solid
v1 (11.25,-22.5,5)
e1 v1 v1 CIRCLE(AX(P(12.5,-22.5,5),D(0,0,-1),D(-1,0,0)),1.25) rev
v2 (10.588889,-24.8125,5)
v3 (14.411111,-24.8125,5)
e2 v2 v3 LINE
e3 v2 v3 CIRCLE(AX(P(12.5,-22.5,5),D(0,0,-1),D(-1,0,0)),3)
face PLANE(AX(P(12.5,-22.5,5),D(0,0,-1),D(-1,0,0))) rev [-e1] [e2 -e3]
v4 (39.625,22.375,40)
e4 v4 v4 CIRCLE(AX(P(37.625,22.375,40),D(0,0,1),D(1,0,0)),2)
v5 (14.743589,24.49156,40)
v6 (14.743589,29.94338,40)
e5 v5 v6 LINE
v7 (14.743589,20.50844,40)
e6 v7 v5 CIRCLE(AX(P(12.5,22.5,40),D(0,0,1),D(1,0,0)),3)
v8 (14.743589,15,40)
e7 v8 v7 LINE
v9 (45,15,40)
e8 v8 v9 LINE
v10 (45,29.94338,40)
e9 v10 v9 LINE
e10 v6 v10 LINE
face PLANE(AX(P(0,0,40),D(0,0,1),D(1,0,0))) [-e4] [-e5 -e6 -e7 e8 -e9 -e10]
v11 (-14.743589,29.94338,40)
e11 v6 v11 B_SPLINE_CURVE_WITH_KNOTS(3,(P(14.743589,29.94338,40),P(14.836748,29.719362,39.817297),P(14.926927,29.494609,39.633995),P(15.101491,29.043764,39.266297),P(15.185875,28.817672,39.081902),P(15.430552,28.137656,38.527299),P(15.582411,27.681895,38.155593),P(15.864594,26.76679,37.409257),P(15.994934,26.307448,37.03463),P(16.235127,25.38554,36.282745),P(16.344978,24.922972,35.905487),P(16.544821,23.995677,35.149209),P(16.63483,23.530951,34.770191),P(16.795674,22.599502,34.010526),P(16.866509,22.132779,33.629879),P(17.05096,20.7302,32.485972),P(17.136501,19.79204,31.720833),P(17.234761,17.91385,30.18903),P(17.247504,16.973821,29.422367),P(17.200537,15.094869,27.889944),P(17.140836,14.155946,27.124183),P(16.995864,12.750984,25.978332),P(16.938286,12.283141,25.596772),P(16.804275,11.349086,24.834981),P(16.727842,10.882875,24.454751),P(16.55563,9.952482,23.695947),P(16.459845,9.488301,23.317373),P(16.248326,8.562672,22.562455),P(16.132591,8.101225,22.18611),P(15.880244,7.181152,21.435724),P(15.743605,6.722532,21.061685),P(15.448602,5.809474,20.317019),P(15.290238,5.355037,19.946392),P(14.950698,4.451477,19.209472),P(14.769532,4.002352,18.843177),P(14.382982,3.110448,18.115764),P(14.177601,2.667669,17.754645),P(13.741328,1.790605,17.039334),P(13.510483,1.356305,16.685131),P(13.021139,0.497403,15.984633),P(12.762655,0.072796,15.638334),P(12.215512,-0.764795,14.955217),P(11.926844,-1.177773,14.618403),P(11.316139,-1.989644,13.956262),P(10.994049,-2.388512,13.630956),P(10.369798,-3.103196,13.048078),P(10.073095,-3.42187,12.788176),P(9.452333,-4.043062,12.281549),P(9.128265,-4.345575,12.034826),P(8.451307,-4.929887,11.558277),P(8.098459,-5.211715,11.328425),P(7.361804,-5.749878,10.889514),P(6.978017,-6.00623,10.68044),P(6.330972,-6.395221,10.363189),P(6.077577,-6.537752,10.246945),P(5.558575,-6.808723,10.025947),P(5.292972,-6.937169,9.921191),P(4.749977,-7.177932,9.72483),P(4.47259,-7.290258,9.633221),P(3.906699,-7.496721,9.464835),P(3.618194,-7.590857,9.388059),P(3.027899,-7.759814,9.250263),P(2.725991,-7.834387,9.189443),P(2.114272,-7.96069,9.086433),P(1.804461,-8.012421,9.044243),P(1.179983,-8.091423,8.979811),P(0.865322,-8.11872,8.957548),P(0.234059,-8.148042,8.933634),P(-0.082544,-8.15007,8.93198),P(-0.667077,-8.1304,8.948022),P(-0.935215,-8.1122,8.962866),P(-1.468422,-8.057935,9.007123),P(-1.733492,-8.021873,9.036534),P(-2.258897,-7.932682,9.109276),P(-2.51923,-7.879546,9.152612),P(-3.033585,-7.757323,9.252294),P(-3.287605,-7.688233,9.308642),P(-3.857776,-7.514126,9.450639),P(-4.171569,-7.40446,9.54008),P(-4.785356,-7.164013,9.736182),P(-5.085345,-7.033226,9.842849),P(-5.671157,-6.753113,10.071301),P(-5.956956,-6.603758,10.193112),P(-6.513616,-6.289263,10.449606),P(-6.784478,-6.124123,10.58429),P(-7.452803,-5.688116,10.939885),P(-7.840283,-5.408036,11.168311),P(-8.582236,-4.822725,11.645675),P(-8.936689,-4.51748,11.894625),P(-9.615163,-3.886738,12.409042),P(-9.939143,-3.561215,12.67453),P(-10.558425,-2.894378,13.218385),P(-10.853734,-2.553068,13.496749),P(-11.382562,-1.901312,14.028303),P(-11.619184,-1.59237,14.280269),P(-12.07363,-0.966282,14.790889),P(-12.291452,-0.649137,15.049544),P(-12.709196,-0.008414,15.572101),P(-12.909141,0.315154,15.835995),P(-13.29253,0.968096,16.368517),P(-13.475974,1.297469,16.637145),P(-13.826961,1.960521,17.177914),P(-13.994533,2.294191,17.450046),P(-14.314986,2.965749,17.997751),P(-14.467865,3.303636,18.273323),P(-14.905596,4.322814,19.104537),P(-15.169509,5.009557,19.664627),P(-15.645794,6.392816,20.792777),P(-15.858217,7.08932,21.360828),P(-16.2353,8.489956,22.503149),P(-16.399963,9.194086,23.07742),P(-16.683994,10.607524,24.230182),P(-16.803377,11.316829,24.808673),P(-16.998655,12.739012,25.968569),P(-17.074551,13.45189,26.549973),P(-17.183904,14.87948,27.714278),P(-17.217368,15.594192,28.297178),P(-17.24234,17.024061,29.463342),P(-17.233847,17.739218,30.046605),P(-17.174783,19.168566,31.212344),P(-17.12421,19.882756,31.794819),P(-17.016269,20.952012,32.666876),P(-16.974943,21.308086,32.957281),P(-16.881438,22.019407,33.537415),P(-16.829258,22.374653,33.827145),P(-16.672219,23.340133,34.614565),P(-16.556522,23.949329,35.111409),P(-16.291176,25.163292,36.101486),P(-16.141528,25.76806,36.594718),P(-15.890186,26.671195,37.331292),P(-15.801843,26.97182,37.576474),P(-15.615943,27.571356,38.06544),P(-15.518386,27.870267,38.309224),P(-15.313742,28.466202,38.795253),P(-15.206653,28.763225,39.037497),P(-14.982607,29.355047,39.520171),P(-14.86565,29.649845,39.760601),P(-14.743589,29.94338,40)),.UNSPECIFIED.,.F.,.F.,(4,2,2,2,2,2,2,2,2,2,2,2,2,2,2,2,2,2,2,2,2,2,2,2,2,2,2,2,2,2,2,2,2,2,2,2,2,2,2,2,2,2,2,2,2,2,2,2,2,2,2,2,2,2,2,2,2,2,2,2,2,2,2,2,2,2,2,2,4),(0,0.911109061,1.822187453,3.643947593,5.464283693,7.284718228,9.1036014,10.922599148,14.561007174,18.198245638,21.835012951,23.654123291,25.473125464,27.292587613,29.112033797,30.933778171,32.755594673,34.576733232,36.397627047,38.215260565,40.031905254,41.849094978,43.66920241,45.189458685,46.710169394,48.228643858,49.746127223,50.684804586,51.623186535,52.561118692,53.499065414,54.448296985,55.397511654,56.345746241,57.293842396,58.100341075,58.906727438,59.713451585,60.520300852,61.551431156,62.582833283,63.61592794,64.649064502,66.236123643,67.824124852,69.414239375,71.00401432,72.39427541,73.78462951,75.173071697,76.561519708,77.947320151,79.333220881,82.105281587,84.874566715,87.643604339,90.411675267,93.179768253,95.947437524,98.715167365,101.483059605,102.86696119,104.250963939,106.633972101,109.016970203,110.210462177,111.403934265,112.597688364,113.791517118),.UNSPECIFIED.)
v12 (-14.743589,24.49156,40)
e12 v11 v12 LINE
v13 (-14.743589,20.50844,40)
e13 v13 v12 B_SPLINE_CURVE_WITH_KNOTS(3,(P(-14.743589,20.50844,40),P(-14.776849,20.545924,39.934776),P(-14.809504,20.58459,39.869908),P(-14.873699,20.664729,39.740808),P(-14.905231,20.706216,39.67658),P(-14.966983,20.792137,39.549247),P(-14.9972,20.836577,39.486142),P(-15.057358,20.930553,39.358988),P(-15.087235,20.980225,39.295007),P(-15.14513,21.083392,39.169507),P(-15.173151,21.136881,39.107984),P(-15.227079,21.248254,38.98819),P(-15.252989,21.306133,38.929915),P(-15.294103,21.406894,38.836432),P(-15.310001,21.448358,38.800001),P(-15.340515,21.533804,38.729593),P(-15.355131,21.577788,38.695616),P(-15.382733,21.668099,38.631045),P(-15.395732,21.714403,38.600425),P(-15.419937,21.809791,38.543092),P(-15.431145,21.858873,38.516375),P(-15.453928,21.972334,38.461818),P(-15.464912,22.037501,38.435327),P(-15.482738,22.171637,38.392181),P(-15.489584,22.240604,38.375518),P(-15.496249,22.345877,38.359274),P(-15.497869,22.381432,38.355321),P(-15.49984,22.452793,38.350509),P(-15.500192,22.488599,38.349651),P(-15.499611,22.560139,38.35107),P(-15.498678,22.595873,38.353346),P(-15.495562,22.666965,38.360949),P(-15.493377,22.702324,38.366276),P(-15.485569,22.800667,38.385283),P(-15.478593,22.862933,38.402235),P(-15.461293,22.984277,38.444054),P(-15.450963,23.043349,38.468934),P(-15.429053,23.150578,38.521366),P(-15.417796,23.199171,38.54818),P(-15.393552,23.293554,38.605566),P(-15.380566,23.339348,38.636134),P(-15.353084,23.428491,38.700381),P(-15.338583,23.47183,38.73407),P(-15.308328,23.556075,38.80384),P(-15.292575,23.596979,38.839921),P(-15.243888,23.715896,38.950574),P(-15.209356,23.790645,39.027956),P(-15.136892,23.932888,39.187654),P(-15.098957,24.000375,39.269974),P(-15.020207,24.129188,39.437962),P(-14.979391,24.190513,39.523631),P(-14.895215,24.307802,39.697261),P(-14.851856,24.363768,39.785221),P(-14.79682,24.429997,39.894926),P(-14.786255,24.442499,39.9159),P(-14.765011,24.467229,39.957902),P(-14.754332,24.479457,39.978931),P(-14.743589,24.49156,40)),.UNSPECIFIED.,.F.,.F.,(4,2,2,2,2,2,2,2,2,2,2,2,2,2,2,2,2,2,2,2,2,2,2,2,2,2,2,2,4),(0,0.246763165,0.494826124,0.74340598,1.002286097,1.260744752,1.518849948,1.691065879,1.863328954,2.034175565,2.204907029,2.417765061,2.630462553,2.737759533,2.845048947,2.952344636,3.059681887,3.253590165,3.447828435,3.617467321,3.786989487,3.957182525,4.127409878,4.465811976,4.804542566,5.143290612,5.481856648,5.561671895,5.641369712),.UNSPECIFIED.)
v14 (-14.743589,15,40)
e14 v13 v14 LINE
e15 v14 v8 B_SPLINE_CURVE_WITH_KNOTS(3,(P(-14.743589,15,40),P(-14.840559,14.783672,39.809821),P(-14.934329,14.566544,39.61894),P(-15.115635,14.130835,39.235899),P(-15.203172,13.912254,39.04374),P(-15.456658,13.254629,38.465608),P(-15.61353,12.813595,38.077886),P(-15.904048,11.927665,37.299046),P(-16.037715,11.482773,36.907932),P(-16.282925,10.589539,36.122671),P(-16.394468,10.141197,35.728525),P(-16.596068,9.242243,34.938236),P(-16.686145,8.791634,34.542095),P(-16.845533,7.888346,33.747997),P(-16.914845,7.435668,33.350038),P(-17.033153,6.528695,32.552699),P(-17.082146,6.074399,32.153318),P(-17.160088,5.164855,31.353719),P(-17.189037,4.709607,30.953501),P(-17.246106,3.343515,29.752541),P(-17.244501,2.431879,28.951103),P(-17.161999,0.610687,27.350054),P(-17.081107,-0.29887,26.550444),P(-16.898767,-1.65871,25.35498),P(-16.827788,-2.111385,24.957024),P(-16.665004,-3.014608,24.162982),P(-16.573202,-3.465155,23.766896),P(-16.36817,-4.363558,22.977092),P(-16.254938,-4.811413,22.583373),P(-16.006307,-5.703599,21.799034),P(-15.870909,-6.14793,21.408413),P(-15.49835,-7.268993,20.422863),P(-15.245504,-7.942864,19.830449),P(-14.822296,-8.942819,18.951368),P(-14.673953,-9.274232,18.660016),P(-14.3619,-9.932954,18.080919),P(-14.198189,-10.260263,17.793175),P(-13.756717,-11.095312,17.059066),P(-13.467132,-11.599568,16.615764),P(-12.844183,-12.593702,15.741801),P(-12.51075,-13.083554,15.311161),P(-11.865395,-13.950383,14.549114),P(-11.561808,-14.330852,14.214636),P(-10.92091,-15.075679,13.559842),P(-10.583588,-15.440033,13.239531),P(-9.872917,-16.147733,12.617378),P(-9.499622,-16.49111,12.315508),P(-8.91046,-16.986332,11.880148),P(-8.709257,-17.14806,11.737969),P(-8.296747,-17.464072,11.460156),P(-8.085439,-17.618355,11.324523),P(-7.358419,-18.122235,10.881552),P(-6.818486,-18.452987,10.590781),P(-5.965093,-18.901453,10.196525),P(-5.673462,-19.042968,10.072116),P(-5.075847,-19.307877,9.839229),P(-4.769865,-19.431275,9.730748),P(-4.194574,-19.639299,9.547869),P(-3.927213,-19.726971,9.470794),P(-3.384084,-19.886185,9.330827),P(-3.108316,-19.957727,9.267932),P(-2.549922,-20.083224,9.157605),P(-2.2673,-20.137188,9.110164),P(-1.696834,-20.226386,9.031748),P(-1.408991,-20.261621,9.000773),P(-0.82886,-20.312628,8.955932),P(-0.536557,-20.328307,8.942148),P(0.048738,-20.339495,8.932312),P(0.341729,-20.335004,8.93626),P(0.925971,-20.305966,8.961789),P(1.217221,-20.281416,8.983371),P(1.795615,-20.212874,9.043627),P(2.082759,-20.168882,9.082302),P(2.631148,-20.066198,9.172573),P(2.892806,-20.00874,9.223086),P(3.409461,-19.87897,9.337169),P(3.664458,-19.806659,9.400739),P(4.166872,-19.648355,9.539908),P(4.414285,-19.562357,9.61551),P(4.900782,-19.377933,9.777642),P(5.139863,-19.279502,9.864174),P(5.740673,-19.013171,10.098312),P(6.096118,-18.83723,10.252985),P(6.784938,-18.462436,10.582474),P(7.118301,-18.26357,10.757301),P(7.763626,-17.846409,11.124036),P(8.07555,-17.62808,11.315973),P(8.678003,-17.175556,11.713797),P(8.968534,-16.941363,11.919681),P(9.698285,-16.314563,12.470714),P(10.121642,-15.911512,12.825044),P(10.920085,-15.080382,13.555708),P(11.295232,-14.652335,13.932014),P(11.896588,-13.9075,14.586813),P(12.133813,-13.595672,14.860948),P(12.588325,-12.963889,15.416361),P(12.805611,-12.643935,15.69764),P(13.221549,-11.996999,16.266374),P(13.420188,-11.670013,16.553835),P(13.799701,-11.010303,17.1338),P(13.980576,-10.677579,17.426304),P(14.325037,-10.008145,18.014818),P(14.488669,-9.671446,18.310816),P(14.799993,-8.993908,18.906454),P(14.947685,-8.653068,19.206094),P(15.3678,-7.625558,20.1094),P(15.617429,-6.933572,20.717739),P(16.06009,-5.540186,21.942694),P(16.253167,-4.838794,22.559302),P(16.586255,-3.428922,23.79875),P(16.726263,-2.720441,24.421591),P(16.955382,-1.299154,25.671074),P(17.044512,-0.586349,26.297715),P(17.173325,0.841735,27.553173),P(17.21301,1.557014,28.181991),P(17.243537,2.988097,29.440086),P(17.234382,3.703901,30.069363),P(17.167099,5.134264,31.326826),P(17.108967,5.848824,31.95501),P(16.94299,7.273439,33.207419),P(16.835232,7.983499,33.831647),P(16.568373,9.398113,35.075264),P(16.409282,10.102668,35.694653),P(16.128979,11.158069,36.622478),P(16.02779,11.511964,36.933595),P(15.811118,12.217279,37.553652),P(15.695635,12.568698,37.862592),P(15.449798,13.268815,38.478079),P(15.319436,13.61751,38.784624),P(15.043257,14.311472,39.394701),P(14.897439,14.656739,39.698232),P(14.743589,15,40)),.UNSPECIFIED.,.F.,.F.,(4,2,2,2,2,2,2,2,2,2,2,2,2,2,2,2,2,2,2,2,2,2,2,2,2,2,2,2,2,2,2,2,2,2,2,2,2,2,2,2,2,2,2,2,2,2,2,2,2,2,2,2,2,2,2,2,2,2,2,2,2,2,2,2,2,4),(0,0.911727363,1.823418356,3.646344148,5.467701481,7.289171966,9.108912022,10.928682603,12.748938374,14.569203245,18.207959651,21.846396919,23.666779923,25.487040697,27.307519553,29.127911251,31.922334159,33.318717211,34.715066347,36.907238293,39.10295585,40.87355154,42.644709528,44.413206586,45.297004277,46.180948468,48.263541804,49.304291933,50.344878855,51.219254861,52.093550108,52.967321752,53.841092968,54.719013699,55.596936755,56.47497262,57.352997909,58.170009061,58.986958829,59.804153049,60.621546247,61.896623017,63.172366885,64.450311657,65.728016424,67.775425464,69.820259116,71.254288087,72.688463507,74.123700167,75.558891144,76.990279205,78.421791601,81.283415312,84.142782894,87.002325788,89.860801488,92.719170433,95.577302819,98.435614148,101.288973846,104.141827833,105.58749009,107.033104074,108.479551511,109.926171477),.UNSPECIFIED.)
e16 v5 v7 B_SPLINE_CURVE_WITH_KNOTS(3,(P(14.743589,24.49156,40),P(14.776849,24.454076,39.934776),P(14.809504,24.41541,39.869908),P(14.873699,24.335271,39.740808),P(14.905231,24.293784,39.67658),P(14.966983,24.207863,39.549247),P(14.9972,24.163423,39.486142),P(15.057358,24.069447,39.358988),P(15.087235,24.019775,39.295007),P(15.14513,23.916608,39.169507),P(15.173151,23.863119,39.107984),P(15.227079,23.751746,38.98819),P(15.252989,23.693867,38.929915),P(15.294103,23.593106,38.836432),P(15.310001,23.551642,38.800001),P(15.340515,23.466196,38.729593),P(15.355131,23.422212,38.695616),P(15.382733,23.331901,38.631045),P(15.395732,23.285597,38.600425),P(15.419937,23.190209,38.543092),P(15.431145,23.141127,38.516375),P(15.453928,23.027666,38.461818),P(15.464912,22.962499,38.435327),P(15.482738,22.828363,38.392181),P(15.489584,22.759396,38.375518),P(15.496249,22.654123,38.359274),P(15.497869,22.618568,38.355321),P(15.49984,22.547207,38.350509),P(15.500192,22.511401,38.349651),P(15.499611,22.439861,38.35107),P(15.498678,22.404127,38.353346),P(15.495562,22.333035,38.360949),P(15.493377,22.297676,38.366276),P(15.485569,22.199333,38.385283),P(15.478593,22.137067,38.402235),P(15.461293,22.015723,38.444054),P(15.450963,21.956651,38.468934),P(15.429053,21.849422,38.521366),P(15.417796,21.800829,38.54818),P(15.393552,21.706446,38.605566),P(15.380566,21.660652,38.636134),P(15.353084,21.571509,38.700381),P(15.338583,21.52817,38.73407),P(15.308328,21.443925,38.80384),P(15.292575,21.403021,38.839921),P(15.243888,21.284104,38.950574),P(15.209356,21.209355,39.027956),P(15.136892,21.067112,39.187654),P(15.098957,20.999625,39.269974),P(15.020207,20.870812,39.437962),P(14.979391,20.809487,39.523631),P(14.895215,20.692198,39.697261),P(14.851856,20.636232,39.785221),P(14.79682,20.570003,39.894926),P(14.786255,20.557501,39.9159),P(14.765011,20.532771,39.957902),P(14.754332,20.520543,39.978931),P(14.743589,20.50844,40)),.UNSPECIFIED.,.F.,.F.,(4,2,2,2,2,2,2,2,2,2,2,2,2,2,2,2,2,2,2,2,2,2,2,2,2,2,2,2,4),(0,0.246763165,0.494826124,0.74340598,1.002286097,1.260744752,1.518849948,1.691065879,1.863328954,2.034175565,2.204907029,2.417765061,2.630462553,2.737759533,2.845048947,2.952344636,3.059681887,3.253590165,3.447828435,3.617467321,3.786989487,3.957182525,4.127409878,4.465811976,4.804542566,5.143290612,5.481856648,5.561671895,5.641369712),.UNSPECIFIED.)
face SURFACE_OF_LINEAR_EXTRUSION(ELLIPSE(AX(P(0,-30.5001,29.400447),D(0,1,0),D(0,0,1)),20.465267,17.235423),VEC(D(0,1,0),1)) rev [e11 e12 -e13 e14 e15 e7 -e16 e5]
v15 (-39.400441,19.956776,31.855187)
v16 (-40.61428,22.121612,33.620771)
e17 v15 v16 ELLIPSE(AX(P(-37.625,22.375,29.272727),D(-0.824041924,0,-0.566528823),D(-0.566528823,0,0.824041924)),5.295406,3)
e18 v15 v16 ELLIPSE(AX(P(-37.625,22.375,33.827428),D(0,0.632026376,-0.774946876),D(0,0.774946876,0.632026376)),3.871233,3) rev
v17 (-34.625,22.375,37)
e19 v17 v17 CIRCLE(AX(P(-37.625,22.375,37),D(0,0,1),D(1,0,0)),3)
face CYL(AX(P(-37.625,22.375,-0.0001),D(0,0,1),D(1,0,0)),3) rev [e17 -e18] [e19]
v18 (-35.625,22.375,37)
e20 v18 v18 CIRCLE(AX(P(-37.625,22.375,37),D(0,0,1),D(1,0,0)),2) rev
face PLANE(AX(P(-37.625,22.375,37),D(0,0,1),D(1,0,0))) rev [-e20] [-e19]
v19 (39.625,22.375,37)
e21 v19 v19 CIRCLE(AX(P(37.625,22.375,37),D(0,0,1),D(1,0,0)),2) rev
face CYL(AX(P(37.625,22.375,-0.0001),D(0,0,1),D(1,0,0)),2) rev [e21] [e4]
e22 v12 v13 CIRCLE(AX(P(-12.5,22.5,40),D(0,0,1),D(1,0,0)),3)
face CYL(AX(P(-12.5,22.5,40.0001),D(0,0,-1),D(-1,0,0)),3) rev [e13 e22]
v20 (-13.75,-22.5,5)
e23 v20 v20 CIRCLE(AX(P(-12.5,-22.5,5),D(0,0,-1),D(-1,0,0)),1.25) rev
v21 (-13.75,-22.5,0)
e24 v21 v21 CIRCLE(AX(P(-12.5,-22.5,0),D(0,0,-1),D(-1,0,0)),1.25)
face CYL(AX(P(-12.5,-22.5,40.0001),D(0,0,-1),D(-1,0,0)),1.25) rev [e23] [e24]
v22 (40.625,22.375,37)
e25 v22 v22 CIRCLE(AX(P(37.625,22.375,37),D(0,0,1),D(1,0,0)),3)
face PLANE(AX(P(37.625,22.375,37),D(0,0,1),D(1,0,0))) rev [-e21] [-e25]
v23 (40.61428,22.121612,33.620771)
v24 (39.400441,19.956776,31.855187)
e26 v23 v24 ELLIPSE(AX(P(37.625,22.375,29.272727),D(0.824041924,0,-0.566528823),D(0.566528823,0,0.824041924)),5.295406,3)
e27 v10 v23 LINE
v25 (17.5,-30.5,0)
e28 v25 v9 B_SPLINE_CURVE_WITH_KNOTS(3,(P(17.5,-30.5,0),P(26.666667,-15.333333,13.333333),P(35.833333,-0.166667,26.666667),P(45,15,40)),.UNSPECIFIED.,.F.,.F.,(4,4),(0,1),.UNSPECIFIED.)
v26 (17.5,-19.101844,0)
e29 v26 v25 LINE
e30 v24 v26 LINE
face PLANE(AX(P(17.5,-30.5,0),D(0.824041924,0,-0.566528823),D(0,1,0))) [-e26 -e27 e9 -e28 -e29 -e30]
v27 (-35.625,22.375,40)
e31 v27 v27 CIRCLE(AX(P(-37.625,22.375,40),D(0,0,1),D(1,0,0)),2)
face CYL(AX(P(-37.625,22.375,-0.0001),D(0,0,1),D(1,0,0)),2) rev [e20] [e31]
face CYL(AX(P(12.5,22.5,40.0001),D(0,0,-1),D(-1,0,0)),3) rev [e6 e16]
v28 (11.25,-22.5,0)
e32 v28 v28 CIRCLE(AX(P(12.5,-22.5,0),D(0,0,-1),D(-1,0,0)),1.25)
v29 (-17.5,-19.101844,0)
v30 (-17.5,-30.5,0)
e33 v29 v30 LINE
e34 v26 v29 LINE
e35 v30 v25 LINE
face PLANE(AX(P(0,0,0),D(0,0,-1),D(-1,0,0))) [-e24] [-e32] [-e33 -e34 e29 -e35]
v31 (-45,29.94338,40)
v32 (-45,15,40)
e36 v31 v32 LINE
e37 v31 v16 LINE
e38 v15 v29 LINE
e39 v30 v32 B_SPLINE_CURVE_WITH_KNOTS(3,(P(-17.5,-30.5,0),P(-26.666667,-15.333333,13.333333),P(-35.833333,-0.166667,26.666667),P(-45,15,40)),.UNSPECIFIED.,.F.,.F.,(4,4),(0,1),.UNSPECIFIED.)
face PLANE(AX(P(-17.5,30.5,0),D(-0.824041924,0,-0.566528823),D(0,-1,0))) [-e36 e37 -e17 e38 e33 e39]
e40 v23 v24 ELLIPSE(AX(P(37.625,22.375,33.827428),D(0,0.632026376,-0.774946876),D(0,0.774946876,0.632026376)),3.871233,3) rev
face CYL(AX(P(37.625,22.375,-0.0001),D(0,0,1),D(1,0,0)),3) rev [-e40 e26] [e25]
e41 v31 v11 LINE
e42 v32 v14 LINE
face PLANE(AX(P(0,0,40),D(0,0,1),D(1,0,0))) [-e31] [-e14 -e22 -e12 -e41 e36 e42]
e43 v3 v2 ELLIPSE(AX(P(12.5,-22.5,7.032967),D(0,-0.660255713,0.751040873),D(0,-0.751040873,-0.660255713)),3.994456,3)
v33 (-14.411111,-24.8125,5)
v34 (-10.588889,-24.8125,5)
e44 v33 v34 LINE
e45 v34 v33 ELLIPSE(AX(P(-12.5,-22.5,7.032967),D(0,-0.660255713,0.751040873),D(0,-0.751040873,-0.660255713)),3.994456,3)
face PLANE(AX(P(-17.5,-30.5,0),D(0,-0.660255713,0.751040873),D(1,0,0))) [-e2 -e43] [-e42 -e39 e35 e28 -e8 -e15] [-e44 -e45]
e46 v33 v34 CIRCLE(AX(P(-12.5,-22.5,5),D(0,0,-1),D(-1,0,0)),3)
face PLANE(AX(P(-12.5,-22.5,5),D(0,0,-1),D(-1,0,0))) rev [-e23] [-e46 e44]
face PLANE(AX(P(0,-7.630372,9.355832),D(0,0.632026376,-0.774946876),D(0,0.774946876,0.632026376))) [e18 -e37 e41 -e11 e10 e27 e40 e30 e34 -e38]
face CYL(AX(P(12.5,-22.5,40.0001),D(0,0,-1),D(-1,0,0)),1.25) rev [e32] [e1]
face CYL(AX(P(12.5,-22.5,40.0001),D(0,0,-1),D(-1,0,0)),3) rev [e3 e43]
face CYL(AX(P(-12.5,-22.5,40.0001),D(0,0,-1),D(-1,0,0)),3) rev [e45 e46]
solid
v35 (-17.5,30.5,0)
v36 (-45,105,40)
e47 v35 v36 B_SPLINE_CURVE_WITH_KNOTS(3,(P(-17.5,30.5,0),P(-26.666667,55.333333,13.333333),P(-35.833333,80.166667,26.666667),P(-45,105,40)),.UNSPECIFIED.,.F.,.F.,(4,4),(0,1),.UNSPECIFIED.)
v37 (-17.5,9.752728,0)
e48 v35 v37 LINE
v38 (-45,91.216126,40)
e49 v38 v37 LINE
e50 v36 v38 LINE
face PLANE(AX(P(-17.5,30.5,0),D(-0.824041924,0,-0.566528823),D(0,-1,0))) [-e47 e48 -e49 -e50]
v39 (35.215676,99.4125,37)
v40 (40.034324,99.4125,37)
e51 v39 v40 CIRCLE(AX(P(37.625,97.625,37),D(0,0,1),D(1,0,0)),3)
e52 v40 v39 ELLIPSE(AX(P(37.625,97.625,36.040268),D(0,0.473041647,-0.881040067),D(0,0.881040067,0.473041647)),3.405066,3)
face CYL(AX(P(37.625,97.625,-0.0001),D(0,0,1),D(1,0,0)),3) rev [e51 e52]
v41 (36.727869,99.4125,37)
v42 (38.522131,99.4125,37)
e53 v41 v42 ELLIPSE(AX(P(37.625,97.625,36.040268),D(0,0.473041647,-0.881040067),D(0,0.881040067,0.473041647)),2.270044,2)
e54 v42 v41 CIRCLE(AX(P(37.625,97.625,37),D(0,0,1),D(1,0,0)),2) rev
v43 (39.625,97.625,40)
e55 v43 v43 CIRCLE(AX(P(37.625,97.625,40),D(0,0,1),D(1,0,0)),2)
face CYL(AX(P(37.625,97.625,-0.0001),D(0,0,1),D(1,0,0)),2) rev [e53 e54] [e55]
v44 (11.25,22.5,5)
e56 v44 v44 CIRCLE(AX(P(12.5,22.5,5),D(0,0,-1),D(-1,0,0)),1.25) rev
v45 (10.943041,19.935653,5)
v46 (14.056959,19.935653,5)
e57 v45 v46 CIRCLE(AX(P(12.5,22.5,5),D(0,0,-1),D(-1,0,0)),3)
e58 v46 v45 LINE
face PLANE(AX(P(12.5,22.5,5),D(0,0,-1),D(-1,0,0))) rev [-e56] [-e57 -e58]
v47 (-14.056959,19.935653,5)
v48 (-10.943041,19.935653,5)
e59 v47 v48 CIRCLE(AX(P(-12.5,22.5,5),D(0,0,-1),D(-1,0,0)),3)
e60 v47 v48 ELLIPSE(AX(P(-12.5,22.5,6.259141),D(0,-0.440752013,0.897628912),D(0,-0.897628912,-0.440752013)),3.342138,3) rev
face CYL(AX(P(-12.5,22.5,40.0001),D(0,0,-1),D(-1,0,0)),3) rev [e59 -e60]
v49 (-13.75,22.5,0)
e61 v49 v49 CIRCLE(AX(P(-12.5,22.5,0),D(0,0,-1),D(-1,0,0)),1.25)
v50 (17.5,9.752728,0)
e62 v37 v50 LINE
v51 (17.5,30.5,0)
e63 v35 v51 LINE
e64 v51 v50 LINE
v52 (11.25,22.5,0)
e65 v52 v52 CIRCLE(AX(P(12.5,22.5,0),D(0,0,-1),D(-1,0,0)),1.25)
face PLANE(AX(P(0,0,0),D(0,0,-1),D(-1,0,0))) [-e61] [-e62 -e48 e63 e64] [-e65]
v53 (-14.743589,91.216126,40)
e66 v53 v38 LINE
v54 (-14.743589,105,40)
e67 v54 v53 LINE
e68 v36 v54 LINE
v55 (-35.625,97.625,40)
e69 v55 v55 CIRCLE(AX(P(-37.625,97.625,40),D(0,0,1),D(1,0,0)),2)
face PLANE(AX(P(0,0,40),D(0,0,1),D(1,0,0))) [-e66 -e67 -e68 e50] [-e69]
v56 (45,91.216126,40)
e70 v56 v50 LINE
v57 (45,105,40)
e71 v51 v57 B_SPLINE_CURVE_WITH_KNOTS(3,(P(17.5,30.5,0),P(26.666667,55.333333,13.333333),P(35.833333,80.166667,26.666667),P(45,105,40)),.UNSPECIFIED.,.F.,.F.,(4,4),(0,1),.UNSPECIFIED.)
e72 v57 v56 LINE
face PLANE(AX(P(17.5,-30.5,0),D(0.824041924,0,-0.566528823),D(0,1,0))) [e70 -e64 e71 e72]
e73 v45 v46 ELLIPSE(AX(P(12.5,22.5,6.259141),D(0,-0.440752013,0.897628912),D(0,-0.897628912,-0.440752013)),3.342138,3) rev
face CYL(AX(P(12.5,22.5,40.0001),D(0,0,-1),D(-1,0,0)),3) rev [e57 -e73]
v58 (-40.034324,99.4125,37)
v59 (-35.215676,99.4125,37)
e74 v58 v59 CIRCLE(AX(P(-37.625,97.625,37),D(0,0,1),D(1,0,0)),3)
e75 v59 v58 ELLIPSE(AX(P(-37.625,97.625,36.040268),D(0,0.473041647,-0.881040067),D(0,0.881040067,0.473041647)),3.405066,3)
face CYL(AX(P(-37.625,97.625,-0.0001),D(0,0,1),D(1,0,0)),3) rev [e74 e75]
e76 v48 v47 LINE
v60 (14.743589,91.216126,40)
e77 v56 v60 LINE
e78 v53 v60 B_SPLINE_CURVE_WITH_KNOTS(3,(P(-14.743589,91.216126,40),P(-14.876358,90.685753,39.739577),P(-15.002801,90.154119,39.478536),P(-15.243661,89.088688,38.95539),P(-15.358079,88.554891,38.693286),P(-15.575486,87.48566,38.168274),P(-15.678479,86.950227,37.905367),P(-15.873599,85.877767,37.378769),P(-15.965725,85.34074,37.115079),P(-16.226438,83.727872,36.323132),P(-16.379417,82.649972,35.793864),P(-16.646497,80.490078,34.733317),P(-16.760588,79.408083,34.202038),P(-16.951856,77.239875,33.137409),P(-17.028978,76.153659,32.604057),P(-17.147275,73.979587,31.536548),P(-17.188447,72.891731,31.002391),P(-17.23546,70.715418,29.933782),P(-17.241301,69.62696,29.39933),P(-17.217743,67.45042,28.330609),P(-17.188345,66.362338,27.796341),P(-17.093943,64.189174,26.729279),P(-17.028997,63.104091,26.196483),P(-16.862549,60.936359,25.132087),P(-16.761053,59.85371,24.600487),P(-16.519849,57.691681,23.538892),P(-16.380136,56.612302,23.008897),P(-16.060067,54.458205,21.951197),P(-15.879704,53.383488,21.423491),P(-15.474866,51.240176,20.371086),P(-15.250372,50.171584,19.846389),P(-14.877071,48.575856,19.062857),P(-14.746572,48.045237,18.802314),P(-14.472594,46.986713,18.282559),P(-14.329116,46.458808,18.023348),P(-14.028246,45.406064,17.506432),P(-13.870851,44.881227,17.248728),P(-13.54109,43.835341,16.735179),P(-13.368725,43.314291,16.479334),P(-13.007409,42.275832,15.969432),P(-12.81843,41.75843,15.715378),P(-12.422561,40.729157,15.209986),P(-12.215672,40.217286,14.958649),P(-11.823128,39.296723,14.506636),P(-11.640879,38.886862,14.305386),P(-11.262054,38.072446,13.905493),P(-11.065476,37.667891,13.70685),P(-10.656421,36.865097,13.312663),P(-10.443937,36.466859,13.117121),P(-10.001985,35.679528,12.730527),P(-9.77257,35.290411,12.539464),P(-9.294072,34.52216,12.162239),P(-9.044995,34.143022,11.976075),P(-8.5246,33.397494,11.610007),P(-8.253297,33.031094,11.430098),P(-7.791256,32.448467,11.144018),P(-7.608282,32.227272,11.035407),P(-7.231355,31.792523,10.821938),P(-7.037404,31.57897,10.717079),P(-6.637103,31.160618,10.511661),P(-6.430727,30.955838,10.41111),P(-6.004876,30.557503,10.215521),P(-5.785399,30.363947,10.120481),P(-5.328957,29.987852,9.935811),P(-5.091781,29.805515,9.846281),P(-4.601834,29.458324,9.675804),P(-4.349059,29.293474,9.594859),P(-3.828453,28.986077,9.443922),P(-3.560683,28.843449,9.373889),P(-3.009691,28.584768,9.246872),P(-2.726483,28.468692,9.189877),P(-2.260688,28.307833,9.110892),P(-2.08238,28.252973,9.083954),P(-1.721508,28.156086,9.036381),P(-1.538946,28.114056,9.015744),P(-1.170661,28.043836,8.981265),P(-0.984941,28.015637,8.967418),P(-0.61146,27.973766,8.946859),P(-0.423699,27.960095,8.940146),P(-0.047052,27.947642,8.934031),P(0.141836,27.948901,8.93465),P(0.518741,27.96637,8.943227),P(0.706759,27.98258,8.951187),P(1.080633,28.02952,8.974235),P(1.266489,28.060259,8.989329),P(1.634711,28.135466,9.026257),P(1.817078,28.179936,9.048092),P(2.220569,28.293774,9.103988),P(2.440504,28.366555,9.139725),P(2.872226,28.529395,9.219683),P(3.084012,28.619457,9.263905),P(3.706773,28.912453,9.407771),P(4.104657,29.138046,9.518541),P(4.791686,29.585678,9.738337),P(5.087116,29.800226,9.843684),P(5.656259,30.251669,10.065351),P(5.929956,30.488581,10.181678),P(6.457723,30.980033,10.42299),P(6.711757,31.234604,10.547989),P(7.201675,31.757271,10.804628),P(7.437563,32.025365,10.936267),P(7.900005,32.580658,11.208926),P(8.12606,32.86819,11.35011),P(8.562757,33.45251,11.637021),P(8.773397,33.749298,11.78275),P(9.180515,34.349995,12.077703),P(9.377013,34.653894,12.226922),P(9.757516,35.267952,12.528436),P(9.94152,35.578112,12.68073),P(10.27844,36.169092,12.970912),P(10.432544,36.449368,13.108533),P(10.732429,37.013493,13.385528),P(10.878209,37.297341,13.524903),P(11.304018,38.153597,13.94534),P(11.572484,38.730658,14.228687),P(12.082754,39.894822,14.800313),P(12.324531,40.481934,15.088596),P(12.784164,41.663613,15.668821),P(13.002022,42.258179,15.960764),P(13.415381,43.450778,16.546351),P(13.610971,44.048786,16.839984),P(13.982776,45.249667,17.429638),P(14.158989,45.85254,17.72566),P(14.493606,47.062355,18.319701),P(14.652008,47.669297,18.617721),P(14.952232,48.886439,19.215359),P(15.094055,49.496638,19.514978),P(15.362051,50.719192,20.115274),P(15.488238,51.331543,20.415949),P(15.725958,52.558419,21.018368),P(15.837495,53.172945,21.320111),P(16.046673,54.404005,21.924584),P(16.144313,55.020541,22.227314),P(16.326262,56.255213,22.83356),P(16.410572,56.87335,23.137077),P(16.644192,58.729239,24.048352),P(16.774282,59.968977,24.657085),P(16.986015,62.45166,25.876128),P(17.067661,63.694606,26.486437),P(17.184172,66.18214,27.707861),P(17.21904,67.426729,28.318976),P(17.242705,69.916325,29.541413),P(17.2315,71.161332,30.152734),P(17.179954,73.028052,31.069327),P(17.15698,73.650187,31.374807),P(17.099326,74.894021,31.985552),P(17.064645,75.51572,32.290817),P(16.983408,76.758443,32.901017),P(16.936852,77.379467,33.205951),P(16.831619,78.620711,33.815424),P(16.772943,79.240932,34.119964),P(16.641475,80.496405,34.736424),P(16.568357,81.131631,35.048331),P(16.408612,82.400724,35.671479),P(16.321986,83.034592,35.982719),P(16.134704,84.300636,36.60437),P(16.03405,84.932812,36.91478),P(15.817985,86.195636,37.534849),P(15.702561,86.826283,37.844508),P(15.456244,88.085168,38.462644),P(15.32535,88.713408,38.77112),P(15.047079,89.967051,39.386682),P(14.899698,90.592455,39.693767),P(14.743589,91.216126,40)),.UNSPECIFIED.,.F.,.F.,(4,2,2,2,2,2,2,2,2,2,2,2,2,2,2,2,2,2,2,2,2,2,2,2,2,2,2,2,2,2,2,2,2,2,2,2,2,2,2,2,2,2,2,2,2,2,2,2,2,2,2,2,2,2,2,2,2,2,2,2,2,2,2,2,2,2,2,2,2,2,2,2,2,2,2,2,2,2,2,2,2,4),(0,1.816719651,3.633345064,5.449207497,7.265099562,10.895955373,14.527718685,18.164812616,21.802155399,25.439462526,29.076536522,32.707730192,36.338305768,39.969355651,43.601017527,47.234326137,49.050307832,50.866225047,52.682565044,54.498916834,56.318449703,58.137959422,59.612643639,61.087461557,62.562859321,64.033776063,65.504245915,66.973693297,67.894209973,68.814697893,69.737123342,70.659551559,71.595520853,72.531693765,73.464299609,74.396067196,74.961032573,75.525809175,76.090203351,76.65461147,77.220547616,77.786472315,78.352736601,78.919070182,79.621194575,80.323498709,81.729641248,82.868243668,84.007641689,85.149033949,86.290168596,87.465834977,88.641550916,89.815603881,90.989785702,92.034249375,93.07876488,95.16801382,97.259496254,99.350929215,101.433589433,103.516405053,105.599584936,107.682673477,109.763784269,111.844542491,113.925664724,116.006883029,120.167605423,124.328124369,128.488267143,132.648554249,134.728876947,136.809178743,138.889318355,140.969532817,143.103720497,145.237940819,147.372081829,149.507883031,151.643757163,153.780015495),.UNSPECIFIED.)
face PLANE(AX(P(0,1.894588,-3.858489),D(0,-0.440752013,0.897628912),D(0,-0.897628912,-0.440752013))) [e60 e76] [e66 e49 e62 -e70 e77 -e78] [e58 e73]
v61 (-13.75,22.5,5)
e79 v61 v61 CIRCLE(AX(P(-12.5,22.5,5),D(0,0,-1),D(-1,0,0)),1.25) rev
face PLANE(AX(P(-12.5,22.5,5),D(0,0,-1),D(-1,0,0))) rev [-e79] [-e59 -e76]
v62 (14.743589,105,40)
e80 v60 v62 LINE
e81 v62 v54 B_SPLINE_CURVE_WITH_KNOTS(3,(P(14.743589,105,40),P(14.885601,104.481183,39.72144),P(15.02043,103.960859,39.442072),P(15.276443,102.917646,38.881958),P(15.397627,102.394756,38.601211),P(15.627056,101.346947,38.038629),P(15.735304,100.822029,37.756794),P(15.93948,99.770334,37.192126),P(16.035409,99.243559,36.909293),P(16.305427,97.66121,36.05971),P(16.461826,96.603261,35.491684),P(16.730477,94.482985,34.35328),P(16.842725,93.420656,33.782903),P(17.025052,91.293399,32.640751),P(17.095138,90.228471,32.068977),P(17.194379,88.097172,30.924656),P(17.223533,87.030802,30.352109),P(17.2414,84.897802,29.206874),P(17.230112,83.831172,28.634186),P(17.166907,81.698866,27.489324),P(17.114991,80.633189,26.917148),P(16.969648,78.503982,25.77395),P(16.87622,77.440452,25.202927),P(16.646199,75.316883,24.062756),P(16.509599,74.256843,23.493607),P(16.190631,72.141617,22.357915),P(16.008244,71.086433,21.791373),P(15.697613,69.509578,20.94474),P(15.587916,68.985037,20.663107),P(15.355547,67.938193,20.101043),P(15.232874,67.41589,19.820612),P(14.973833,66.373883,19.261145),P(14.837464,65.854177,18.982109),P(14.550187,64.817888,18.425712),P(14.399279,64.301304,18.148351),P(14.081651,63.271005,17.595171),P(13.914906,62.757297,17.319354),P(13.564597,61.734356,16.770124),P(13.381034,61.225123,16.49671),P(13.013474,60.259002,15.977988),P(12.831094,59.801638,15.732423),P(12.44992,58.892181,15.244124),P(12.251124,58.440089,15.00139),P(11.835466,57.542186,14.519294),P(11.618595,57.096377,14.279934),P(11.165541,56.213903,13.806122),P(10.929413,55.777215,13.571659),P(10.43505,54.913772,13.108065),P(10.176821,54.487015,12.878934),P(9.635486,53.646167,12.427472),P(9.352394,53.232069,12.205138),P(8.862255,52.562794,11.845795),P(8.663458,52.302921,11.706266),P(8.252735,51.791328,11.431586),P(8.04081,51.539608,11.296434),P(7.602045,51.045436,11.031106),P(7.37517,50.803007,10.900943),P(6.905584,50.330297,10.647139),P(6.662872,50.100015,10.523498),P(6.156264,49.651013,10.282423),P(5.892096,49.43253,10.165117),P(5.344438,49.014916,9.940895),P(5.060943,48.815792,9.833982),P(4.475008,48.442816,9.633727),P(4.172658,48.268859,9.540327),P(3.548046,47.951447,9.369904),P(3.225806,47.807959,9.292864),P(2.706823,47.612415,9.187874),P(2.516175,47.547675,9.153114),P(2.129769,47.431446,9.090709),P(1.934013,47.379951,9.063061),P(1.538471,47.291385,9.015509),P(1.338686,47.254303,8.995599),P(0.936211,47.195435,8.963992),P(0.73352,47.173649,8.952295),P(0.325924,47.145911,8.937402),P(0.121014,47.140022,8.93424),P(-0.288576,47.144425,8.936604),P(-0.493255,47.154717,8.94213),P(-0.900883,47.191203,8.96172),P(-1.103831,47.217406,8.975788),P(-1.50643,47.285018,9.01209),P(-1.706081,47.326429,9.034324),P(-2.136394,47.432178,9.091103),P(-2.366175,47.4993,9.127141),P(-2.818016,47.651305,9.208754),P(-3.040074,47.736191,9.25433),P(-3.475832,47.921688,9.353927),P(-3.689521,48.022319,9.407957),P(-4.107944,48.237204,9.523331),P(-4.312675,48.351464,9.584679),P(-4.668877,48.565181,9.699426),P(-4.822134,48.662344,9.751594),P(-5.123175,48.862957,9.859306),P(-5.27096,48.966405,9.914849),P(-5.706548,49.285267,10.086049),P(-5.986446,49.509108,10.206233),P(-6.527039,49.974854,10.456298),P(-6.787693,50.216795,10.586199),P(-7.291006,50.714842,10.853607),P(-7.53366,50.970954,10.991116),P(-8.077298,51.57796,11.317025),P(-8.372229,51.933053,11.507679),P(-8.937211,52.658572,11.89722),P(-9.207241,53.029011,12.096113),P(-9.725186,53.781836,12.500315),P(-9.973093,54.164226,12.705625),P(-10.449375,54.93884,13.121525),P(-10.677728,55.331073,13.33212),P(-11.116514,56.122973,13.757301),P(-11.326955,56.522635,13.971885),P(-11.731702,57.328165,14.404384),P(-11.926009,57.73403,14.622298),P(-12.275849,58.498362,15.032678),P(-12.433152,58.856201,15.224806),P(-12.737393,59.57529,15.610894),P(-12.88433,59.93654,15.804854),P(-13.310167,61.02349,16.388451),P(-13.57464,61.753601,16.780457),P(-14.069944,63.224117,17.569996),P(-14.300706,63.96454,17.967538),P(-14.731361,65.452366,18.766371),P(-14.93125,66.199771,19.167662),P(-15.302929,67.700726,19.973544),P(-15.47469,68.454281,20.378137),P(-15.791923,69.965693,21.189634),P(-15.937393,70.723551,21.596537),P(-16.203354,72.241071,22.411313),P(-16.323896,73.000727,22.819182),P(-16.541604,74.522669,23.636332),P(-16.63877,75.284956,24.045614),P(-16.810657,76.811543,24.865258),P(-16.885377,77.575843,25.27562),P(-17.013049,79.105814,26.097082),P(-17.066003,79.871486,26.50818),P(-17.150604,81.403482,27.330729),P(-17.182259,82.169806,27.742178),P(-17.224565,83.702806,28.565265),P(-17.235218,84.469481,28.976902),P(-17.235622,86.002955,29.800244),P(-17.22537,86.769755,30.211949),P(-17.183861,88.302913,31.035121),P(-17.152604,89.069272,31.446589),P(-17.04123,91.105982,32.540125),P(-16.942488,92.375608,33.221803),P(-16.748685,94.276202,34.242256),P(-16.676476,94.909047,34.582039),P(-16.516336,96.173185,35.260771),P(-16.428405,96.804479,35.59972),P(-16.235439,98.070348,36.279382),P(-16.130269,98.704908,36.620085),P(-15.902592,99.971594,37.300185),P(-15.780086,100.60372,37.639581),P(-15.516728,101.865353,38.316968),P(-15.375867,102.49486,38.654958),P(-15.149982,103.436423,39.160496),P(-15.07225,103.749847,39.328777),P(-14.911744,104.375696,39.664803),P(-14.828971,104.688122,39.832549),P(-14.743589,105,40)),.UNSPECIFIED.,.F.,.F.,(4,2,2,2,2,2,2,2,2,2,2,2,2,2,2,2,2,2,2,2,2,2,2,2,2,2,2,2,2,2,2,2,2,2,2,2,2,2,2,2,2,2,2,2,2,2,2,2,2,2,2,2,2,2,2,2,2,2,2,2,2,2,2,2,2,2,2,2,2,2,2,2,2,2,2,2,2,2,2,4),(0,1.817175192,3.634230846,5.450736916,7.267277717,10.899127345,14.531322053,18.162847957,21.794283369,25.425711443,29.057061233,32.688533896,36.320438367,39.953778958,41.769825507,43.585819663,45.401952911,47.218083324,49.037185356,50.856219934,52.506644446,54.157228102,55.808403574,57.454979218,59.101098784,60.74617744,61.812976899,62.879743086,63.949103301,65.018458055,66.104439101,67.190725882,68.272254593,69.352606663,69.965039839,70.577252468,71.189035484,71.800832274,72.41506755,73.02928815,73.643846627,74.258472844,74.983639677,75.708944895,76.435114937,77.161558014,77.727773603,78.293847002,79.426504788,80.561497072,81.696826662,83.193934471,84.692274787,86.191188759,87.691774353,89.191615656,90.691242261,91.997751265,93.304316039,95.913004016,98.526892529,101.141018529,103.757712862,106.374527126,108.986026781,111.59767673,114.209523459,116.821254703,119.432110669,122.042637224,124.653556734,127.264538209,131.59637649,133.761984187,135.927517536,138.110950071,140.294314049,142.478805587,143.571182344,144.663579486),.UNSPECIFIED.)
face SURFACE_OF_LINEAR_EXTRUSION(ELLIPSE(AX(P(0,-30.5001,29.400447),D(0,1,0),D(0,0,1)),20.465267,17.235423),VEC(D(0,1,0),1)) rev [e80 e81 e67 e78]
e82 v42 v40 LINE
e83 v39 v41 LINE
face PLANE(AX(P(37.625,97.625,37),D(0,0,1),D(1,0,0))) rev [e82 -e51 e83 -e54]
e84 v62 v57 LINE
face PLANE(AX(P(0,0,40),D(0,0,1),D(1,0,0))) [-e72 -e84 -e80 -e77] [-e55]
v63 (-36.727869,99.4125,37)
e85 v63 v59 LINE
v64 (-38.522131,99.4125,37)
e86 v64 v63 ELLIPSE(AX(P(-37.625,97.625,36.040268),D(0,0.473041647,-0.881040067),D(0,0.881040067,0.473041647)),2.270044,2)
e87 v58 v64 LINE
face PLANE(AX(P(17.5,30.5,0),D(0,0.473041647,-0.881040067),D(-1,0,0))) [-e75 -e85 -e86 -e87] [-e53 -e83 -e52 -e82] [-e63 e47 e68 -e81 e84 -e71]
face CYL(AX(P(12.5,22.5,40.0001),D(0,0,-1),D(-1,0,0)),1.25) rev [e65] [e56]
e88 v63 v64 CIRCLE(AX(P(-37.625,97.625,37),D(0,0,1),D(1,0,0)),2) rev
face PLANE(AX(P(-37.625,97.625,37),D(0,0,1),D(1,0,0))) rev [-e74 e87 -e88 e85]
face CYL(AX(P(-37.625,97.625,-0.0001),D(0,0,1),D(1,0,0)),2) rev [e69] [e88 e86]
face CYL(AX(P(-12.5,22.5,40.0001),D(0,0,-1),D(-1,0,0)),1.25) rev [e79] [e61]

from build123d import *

# Parameters (mm, degrees)
SKETCH_5_R               = 1.25
CUT_EXTRUDE_1_DEPTH      = 122.037184526
CUT_EXTRUDE_START        = -5
SKETCH_6_R               = 3
CUT_EXTRUDE_2_DEPTH      = 117.037184526
SKETCH_7_R               = 2
CUT_EXTRUDE_3_DEPTH      = 122.037184526
CUT_EXTRUDE_START_2      = -3
SKETCH_8_R               = 3
CUT_EXTRUDE_4_DEPTH      = 119.037184526
CUT_EXTRUDE_5_DEPTH      = 122.037184526
CUT_EXTRUDE_5_DEPTH_BACK = 122.037184526
SKETCH_12_RX             = 20.465266771
SKETCH_12_RY             = 17.235422909


with BuildPart() as part:
    # Loft 1: read off the stored shape, not the designer's step
    # Loft 1: loft between two sections, ruled curve by curve
    loft_1_from = [
        Edge.make_line((-17.5, 30.5, 0), (17.5, 30.5, 0)),
        Edge.make_line((17.5, 30.5, 0), (17.5, -30.5, 0)),
        Edge.make_line((-17.5, -30.5, 0), (17.5, -30.5, 0)),
        Edge.make_line((-17.5, 30.5, 0), (-17.5, -30.5, 0)),
    ]
    loft_1_to = [
        Edge.make_line((-45, 105, 40), (45, 105, 40)),
        Edge.make_line((45, 105, 40), (45, 15, 40)),
        Edge.make_line((-45, 15, 40), (45, 15, 40)),
        Edge.make_line((-45, 105, 40), (-45, 15, 40)),
    ]
    loft_1 = Solid(Shell([*[Face.make_surface_from_curves(loft_1_from[k], loft_1_to[k]) for k in range(4)], Face(Wire(loft_1_from)), Face(Wire(loft_1_to))]))
    add(loft_1)

    # 草图5 → 切除-拉伸1 (cut, through all)
    with BuildSketch(Plane(origin=(0, 0, 0), x_dir=(-1, 0, 0), z_dir=(0, 0, -1))):
        with Locations((-12.5, 22.5)):
            Circle(SKETCH_5_R)
        with Locations((12.5, 22.5)):
            Circle(SKETCH_5_R)
        with Locations((12.5, -22.5)):
            Circle(SKETCH_5_R)
        with Locations((-12.5, -22.5)):
            Circle(SKETCH_5_R)
    extrude(amount=-CUT_EXTRUDE_1_DEPTH, mode=Mode.SUBTRACT)

    # 草图6 → 切除-拉伸2 (cut, through all)
    with BuildSketch(Plane(origin=(0, 0, 0), x_dir=(-1, 0, 0), z_dir=(0, 0, -1)).offset(CUT_EXTRUDE_START)):
        with Locations((-12.5, 22.5)):
            Circle(SKETCH_6_R)
        with Locations((12.5, 22.5)):
            Circle(SKETCH_6_R)
        with Locations((-12.5, -22.5)):
            Circle(SKETCH_6_R)
        with Locations((12.5, -22.5)):
            Circle(SKETCH_6_R)
    extrude(amount=-CUT_EXTRUDE_2_DEPTH, mode=Mode.SUBTRACT)

    # 草图7 → 切除-拉伸3 (cut, through all)
    with BuildSketch(Plane.XY.offset(40)):
        with Locations((37.625, 22.375)):
            Circle(SKETCH_7_R)
        with Locations((-37.625, 22.375)):
            Circle(SKETCH_7_R)
        with Locations((-37.625, 97.625)):
            Circle(SKETCH_7_R)
        with Locations((37.625, 97.625)):
            Circle(SKETCH_7_R)
    extrude(amount=-CUT_EXTRUDE_3_DEPTH, mode=Mode.SUBTRACT)

    # 草图8 → 切除-拉伸4 (cut, through all)
    with BuildSketch(Plane.XY.offset(40).offset(CUT_EXTRUDE_START_2)):
        with Locations((-37.625, 97.625)):
            Circle(SKETCH_8_R)
        with Locations((37.625, 97.625)):
            Circle(SKETCH_8_R)
        with Locations((37.625, 22.375)):
            Circle(SKETCH_8_R)
        with Locations((-37.625, 22.375)):
            Circle(SKETCH_8_R)
    extrude(amount=-CUT_EXTRUDE_4_DEPTH, mode=Mode.SUBTRACT)

    # 草图11 → Loft 1 2 section 0
    with BuildSketch(Plane.XY.offset(40)):
        with BuildLine():
            Line((-45, 91.216125502), (45, 91.216125502))
            Line((45, 91.216125502), (45, 29.943379718))
            Line((45, 29.943379718), (-45, 29.943379718))
            Line((-45, 29.943379718), (-45, 91.216125502))
        make_face()
    # 草图9 → Loft 1 2 section 1
    with BuildSketch(Plane(origin=(0, 0, 0), x_dir=(-1, 0, 0), z_dir=(0, 0, -1))):
        with BuildLine():
            Line((-17.5, 9.752727906), (17.5, 9.752727906))
            Line((17.5, 9.752727906), (17.5, -19.101844067))
            Line((17.5, -19.101844067), (-17.5, -19.101844067))
            Line((-17.5, -19.101844067), (-17.5, 9.752727906))
        make_face()
    loft(mode=Mode.SUBTRACT)


with BuildPart() as loft_1_2_piece_1:
    # of the separate pieces the step leaves, piece 1, a body of its own (loft_1_2_pieces)
    add(part.part.solids().sort_by_distance((-17.5, 30.5, 0))[0])


with BuildPart() as loft_1_2_piece_2:
    # of the separate pieces the step leaves, piece 2, a body of its own (loft_1_2_pieces)
    add(part.part.solids().sort_by_distance((-17.5, -19.101844067, 0))[0])


with BuildPart() as cut_extrude_5_tool:
    # 草图12 → 切除-拉伸5 (new, two sides: drawn at the far end of the back side and taken through both)
    with BuildSketch(Plane(origin=(0, 0, 0), x_dir=(1, 0, 0), z_dir=(0, 1, 0)).offset(-CUT_EXTRUDE_5_DEPTH_BACK)):
        with Locations(Location((0, -29.400447007), (0, 0, -90))):
            Ellipse(SKETCH_12_RX, SKETCH_12_RY)
    extrude(amount=CUT_EXTRUDE_5_DEPTH + CUT_EXTRUDE_5_DEPTH_BACK)


with BuildPart() as loft_1_2_piece_1_1:
    add(loft_1_2_piece_1.part)

    # 切除-拉伸5: cut by cut_extrude_5_tool
    add(cut_extrude_5_tool.part, mode=Mode.SUBTRACT)


with BuildPart() as loft_1_2_piece_2_1:
    add(loft_1_2_piece_2.part)

    # 切除-拉伸5: cut by cut_extrude_5_tool
    add(cut_extrude_5_tool.part, mode=Mode.SUBTRACT)


solid = Compound([loft_1_2_piece_1_1.part, loft_1_2_piece_2_1.part])
